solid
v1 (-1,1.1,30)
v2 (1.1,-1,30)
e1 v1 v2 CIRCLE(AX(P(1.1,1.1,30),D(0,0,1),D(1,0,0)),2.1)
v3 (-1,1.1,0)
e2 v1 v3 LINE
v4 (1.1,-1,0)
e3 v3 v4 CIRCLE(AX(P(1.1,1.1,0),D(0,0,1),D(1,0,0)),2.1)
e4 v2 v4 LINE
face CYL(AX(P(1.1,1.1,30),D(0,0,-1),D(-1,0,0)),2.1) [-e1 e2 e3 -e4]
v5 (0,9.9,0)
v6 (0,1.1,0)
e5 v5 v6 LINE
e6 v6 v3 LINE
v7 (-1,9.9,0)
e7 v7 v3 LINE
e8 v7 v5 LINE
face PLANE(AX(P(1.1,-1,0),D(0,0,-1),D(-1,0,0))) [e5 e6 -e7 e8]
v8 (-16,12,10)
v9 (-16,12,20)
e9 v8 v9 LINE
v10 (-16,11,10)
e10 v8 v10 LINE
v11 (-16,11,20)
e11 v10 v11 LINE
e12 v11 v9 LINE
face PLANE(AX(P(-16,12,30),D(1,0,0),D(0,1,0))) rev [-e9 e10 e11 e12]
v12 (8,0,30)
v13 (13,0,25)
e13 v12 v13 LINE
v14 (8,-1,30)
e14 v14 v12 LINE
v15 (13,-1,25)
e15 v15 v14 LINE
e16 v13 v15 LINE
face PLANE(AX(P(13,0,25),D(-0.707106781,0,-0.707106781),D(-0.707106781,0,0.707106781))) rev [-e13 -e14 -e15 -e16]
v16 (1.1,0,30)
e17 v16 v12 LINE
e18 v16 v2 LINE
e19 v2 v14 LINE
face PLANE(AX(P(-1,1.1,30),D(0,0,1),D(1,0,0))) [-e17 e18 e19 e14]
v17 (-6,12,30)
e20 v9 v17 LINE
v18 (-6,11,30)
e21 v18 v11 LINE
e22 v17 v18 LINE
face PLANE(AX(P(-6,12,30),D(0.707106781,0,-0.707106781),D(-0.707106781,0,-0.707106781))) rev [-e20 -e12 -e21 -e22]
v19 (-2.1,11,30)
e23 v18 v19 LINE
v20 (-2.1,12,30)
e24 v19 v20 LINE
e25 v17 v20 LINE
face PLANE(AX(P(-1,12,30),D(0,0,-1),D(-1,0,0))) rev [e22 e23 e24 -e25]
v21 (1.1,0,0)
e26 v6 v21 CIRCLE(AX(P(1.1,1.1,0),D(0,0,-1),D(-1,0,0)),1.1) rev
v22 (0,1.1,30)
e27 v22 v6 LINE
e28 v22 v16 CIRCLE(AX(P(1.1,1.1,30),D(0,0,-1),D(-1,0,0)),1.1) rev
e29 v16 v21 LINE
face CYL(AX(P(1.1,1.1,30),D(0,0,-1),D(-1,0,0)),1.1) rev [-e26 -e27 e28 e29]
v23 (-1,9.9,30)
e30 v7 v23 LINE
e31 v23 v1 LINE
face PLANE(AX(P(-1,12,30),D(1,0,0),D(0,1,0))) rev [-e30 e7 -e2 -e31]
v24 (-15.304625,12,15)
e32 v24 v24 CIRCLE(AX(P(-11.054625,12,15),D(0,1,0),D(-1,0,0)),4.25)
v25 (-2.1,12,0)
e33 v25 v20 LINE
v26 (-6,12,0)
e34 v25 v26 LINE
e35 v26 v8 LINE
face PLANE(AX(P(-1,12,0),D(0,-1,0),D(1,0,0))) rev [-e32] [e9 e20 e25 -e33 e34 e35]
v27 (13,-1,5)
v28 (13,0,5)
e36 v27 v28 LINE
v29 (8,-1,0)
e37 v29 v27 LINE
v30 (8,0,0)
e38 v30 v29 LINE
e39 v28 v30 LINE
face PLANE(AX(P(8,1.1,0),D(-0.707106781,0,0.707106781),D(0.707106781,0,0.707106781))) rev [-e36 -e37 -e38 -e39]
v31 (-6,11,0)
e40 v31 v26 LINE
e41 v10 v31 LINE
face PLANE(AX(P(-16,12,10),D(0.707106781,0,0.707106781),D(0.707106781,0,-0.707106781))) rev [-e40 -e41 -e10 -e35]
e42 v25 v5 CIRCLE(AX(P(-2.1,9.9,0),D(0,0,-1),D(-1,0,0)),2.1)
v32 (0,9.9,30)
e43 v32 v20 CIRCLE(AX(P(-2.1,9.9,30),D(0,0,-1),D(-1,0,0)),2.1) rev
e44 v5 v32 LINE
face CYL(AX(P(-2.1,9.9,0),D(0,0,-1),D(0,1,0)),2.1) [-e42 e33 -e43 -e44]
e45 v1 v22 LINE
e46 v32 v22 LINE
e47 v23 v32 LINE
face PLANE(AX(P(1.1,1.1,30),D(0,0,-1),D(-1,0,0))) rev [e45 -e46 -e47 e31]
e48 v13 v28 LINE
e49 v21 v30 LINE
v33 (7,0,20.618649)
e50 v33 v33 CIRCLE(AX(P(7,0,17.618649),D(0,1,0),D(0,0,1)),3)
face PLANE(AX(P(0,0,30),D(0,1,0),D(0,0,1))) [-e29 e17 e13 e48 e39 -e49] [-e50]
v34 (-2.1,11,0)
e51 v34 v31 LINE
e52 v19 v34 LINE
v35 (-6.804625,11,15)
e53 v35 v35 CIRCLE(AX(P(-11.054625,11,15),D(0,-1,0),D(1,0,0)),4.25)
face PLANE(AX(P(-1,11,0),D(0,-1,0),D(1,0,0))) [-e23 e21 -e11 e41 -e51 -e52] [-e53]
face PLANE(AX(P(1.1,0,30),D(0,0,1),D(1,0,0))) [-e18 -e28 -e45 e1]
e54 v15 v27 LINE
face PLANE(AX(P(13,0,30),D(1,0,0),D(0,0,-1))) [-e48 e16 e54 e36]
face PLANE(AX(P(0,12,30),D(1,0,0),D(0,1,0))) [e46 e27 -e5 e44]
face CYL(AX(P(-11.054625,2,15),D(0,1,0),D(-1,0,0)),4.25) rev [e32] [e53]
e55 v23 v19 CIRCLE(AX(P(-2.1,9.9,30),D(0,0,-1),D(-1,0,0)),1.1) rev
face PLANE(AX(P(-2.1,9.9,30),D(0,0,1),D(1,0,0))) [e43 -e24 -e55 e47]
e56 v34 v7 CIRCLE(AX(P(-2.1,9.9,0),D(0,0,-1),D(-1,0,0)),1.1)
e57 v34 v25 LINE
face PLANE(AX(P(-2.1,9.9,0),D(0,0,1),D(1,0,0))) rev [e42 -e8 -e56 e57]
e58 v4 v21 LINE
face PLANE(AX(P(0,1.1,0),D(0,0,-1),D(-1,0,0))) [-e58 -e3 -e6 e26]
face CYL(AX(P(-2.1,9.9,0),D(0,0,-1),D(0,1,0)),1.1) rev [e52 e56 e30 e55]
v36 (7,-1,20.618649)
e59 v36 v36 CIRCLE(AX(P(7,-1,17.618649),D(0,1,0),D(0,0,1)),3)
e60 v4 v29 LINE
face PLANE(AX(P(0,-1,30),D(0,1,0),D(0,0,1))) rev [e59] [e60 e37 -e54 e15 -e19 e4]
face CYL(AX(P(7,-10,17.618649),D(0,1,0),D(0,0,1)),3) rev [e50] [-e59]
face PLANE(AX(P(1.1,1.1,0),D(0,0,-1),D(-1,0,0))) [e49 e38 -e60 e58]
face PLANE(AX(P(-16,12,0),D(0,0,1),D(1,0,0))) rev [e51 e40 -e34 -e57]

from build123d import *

# Parameters (mm, degrees)
SM_BASE_FLANGE_1_DEPTH           = 30
SKETCH_5_R                       = 3
CUT_EXTRUDE_3_DEPTH              = 10
SM_EDGE_FLANGE_1_STRIP_W         = 6.2
SM_EDGE_FLANGE_1_STRIP_H         = 1
SM_EDGE_FLANGE_1_STRIP_CUT_DEPTH = 30
SM_EDGE_FLANGE_1_DEPTH           = 30
CHAMFER_1_SIZE                   = 10
SKETCH_10_R                      = 4.25
CUT_EXTRUDE_4_DEPTH              = 10
CHAMFER_2_SIZE                   = 5


# Sheet-metal steps are written as plain solids
with BuildPart() as part:
    # Sketch 1 → Базовая кромка1 (new body)
    with BuildSketch(Plane.XY):
        with BuildLine():
            Line((0, 12), (0, 1.1))
            ThreePointArc((0, 1.1), (0.322182541, 0.322182541), (1.1, 0))
            Line((1.1, 0), (13, 0))
            Line((13, 0), (13, -1))
            Line((13, -1), (1.1, -1))
            ThreePointArc((1.1, -1), (-0.38492424, -0.38492424), (-1, 1.1))
            Line((-1, 1.1), (-1, 12))
            Line((-1, 12), (0, 12))
        make_face()
    extrude(amount=SM_BASE_FLANGE_1_DEPTH)

    # Эскиз5 → Вырез-Вытянуть3 (cut)
    with BuildSketch(Plane(origin=(0, 0, 0), x_dir=(1, 0, 0), z_dir=(0, 1, 0))):
        with Locations(Location((7, -17.618648825, 0), (0, 0, 270))):
            Circle(SKETCH_5_R)
    extrude(amount=-CUT_EXTRUDE_3_DEPTH, mode=Mode.SUBTRACT)

    # Ребро-кромка1 strip (across the edge) → Ребро-кромка1 strip cut (cut)
    with BuildSketch(Plane(origin=(-1, 12, 30), x_dir=(0, -1, 0), z_dir=(0, 0, -1))):
        with Locations((-1, -0.5)):
            Rectangle(SM_EDGE_FLANGE_1_STRIP_W, SM_EDGE_FLANGE_1_STRIP_H)
    extrude(amount=SM_EDGE_FLANGE_1_STRIP_CUT_DEPTH, mode=Mode.SUBTRACT)

    # Ребро-кромка1 section (across the edge) → Ребро-кромка1 (add)
    with BuildSketch(Plane(origin=(-1, 12, 30), x_dir=(0, -1, 0), z_dir=(0, 0, -1))):
        with BuildLine():
            Line((0, 1.1), (0, 15))
            Line((0, 15), (1, 15))
            Line((1, 15), (1, 1.1))
            ThreePointArc((1, 1.1), (1.322182541, 0.322182541), (2.1, 0))
            Line((2.1, 0), (2.1, -1))
            ThreePointArc((2.1, -1), (0.61507576, -0.38492424), (0, 1.1))
        make_face()
    extrude(amount=SM_EDGE_FLANGE_1_DEPTH)

    # Фаска1
    chamfer_1_edges = [part.edges().sort_by_distance(p)[0] for p in [
        (-16, 11.5, 30),
        (-16, 11.5, 0),
    ]]
    chamfer(chamfer_1_edges, length=CHAMFER_1_SIZE)

    # Эскиз10 → Вырез-Вытянуть4 (cut)
    with BuildSketch(Plane(origin=(0, 12, 0), x_dir=(1, 0, 0), z_dir=(0, 1, 0))):
        with Locations(Location((-11.054624514, -15, 0), (0, 0, 180))):
            Circle(SKETCH_10_R)
    extrude(amount=-CUT_EXTRUDE_4_DEPTH, mode=Mode.SUBTRACT)

    # Фаска2
    chamfer_2_edges = [part.edges().sort_by_distance(p)[0] for p in [
        (13, -0.5, 30),
        (13, -0.5, 0),
    ]]
    chamfer(chamfer_2_edges, length=CHAMFER_2_SIZE)


solid = part.part
